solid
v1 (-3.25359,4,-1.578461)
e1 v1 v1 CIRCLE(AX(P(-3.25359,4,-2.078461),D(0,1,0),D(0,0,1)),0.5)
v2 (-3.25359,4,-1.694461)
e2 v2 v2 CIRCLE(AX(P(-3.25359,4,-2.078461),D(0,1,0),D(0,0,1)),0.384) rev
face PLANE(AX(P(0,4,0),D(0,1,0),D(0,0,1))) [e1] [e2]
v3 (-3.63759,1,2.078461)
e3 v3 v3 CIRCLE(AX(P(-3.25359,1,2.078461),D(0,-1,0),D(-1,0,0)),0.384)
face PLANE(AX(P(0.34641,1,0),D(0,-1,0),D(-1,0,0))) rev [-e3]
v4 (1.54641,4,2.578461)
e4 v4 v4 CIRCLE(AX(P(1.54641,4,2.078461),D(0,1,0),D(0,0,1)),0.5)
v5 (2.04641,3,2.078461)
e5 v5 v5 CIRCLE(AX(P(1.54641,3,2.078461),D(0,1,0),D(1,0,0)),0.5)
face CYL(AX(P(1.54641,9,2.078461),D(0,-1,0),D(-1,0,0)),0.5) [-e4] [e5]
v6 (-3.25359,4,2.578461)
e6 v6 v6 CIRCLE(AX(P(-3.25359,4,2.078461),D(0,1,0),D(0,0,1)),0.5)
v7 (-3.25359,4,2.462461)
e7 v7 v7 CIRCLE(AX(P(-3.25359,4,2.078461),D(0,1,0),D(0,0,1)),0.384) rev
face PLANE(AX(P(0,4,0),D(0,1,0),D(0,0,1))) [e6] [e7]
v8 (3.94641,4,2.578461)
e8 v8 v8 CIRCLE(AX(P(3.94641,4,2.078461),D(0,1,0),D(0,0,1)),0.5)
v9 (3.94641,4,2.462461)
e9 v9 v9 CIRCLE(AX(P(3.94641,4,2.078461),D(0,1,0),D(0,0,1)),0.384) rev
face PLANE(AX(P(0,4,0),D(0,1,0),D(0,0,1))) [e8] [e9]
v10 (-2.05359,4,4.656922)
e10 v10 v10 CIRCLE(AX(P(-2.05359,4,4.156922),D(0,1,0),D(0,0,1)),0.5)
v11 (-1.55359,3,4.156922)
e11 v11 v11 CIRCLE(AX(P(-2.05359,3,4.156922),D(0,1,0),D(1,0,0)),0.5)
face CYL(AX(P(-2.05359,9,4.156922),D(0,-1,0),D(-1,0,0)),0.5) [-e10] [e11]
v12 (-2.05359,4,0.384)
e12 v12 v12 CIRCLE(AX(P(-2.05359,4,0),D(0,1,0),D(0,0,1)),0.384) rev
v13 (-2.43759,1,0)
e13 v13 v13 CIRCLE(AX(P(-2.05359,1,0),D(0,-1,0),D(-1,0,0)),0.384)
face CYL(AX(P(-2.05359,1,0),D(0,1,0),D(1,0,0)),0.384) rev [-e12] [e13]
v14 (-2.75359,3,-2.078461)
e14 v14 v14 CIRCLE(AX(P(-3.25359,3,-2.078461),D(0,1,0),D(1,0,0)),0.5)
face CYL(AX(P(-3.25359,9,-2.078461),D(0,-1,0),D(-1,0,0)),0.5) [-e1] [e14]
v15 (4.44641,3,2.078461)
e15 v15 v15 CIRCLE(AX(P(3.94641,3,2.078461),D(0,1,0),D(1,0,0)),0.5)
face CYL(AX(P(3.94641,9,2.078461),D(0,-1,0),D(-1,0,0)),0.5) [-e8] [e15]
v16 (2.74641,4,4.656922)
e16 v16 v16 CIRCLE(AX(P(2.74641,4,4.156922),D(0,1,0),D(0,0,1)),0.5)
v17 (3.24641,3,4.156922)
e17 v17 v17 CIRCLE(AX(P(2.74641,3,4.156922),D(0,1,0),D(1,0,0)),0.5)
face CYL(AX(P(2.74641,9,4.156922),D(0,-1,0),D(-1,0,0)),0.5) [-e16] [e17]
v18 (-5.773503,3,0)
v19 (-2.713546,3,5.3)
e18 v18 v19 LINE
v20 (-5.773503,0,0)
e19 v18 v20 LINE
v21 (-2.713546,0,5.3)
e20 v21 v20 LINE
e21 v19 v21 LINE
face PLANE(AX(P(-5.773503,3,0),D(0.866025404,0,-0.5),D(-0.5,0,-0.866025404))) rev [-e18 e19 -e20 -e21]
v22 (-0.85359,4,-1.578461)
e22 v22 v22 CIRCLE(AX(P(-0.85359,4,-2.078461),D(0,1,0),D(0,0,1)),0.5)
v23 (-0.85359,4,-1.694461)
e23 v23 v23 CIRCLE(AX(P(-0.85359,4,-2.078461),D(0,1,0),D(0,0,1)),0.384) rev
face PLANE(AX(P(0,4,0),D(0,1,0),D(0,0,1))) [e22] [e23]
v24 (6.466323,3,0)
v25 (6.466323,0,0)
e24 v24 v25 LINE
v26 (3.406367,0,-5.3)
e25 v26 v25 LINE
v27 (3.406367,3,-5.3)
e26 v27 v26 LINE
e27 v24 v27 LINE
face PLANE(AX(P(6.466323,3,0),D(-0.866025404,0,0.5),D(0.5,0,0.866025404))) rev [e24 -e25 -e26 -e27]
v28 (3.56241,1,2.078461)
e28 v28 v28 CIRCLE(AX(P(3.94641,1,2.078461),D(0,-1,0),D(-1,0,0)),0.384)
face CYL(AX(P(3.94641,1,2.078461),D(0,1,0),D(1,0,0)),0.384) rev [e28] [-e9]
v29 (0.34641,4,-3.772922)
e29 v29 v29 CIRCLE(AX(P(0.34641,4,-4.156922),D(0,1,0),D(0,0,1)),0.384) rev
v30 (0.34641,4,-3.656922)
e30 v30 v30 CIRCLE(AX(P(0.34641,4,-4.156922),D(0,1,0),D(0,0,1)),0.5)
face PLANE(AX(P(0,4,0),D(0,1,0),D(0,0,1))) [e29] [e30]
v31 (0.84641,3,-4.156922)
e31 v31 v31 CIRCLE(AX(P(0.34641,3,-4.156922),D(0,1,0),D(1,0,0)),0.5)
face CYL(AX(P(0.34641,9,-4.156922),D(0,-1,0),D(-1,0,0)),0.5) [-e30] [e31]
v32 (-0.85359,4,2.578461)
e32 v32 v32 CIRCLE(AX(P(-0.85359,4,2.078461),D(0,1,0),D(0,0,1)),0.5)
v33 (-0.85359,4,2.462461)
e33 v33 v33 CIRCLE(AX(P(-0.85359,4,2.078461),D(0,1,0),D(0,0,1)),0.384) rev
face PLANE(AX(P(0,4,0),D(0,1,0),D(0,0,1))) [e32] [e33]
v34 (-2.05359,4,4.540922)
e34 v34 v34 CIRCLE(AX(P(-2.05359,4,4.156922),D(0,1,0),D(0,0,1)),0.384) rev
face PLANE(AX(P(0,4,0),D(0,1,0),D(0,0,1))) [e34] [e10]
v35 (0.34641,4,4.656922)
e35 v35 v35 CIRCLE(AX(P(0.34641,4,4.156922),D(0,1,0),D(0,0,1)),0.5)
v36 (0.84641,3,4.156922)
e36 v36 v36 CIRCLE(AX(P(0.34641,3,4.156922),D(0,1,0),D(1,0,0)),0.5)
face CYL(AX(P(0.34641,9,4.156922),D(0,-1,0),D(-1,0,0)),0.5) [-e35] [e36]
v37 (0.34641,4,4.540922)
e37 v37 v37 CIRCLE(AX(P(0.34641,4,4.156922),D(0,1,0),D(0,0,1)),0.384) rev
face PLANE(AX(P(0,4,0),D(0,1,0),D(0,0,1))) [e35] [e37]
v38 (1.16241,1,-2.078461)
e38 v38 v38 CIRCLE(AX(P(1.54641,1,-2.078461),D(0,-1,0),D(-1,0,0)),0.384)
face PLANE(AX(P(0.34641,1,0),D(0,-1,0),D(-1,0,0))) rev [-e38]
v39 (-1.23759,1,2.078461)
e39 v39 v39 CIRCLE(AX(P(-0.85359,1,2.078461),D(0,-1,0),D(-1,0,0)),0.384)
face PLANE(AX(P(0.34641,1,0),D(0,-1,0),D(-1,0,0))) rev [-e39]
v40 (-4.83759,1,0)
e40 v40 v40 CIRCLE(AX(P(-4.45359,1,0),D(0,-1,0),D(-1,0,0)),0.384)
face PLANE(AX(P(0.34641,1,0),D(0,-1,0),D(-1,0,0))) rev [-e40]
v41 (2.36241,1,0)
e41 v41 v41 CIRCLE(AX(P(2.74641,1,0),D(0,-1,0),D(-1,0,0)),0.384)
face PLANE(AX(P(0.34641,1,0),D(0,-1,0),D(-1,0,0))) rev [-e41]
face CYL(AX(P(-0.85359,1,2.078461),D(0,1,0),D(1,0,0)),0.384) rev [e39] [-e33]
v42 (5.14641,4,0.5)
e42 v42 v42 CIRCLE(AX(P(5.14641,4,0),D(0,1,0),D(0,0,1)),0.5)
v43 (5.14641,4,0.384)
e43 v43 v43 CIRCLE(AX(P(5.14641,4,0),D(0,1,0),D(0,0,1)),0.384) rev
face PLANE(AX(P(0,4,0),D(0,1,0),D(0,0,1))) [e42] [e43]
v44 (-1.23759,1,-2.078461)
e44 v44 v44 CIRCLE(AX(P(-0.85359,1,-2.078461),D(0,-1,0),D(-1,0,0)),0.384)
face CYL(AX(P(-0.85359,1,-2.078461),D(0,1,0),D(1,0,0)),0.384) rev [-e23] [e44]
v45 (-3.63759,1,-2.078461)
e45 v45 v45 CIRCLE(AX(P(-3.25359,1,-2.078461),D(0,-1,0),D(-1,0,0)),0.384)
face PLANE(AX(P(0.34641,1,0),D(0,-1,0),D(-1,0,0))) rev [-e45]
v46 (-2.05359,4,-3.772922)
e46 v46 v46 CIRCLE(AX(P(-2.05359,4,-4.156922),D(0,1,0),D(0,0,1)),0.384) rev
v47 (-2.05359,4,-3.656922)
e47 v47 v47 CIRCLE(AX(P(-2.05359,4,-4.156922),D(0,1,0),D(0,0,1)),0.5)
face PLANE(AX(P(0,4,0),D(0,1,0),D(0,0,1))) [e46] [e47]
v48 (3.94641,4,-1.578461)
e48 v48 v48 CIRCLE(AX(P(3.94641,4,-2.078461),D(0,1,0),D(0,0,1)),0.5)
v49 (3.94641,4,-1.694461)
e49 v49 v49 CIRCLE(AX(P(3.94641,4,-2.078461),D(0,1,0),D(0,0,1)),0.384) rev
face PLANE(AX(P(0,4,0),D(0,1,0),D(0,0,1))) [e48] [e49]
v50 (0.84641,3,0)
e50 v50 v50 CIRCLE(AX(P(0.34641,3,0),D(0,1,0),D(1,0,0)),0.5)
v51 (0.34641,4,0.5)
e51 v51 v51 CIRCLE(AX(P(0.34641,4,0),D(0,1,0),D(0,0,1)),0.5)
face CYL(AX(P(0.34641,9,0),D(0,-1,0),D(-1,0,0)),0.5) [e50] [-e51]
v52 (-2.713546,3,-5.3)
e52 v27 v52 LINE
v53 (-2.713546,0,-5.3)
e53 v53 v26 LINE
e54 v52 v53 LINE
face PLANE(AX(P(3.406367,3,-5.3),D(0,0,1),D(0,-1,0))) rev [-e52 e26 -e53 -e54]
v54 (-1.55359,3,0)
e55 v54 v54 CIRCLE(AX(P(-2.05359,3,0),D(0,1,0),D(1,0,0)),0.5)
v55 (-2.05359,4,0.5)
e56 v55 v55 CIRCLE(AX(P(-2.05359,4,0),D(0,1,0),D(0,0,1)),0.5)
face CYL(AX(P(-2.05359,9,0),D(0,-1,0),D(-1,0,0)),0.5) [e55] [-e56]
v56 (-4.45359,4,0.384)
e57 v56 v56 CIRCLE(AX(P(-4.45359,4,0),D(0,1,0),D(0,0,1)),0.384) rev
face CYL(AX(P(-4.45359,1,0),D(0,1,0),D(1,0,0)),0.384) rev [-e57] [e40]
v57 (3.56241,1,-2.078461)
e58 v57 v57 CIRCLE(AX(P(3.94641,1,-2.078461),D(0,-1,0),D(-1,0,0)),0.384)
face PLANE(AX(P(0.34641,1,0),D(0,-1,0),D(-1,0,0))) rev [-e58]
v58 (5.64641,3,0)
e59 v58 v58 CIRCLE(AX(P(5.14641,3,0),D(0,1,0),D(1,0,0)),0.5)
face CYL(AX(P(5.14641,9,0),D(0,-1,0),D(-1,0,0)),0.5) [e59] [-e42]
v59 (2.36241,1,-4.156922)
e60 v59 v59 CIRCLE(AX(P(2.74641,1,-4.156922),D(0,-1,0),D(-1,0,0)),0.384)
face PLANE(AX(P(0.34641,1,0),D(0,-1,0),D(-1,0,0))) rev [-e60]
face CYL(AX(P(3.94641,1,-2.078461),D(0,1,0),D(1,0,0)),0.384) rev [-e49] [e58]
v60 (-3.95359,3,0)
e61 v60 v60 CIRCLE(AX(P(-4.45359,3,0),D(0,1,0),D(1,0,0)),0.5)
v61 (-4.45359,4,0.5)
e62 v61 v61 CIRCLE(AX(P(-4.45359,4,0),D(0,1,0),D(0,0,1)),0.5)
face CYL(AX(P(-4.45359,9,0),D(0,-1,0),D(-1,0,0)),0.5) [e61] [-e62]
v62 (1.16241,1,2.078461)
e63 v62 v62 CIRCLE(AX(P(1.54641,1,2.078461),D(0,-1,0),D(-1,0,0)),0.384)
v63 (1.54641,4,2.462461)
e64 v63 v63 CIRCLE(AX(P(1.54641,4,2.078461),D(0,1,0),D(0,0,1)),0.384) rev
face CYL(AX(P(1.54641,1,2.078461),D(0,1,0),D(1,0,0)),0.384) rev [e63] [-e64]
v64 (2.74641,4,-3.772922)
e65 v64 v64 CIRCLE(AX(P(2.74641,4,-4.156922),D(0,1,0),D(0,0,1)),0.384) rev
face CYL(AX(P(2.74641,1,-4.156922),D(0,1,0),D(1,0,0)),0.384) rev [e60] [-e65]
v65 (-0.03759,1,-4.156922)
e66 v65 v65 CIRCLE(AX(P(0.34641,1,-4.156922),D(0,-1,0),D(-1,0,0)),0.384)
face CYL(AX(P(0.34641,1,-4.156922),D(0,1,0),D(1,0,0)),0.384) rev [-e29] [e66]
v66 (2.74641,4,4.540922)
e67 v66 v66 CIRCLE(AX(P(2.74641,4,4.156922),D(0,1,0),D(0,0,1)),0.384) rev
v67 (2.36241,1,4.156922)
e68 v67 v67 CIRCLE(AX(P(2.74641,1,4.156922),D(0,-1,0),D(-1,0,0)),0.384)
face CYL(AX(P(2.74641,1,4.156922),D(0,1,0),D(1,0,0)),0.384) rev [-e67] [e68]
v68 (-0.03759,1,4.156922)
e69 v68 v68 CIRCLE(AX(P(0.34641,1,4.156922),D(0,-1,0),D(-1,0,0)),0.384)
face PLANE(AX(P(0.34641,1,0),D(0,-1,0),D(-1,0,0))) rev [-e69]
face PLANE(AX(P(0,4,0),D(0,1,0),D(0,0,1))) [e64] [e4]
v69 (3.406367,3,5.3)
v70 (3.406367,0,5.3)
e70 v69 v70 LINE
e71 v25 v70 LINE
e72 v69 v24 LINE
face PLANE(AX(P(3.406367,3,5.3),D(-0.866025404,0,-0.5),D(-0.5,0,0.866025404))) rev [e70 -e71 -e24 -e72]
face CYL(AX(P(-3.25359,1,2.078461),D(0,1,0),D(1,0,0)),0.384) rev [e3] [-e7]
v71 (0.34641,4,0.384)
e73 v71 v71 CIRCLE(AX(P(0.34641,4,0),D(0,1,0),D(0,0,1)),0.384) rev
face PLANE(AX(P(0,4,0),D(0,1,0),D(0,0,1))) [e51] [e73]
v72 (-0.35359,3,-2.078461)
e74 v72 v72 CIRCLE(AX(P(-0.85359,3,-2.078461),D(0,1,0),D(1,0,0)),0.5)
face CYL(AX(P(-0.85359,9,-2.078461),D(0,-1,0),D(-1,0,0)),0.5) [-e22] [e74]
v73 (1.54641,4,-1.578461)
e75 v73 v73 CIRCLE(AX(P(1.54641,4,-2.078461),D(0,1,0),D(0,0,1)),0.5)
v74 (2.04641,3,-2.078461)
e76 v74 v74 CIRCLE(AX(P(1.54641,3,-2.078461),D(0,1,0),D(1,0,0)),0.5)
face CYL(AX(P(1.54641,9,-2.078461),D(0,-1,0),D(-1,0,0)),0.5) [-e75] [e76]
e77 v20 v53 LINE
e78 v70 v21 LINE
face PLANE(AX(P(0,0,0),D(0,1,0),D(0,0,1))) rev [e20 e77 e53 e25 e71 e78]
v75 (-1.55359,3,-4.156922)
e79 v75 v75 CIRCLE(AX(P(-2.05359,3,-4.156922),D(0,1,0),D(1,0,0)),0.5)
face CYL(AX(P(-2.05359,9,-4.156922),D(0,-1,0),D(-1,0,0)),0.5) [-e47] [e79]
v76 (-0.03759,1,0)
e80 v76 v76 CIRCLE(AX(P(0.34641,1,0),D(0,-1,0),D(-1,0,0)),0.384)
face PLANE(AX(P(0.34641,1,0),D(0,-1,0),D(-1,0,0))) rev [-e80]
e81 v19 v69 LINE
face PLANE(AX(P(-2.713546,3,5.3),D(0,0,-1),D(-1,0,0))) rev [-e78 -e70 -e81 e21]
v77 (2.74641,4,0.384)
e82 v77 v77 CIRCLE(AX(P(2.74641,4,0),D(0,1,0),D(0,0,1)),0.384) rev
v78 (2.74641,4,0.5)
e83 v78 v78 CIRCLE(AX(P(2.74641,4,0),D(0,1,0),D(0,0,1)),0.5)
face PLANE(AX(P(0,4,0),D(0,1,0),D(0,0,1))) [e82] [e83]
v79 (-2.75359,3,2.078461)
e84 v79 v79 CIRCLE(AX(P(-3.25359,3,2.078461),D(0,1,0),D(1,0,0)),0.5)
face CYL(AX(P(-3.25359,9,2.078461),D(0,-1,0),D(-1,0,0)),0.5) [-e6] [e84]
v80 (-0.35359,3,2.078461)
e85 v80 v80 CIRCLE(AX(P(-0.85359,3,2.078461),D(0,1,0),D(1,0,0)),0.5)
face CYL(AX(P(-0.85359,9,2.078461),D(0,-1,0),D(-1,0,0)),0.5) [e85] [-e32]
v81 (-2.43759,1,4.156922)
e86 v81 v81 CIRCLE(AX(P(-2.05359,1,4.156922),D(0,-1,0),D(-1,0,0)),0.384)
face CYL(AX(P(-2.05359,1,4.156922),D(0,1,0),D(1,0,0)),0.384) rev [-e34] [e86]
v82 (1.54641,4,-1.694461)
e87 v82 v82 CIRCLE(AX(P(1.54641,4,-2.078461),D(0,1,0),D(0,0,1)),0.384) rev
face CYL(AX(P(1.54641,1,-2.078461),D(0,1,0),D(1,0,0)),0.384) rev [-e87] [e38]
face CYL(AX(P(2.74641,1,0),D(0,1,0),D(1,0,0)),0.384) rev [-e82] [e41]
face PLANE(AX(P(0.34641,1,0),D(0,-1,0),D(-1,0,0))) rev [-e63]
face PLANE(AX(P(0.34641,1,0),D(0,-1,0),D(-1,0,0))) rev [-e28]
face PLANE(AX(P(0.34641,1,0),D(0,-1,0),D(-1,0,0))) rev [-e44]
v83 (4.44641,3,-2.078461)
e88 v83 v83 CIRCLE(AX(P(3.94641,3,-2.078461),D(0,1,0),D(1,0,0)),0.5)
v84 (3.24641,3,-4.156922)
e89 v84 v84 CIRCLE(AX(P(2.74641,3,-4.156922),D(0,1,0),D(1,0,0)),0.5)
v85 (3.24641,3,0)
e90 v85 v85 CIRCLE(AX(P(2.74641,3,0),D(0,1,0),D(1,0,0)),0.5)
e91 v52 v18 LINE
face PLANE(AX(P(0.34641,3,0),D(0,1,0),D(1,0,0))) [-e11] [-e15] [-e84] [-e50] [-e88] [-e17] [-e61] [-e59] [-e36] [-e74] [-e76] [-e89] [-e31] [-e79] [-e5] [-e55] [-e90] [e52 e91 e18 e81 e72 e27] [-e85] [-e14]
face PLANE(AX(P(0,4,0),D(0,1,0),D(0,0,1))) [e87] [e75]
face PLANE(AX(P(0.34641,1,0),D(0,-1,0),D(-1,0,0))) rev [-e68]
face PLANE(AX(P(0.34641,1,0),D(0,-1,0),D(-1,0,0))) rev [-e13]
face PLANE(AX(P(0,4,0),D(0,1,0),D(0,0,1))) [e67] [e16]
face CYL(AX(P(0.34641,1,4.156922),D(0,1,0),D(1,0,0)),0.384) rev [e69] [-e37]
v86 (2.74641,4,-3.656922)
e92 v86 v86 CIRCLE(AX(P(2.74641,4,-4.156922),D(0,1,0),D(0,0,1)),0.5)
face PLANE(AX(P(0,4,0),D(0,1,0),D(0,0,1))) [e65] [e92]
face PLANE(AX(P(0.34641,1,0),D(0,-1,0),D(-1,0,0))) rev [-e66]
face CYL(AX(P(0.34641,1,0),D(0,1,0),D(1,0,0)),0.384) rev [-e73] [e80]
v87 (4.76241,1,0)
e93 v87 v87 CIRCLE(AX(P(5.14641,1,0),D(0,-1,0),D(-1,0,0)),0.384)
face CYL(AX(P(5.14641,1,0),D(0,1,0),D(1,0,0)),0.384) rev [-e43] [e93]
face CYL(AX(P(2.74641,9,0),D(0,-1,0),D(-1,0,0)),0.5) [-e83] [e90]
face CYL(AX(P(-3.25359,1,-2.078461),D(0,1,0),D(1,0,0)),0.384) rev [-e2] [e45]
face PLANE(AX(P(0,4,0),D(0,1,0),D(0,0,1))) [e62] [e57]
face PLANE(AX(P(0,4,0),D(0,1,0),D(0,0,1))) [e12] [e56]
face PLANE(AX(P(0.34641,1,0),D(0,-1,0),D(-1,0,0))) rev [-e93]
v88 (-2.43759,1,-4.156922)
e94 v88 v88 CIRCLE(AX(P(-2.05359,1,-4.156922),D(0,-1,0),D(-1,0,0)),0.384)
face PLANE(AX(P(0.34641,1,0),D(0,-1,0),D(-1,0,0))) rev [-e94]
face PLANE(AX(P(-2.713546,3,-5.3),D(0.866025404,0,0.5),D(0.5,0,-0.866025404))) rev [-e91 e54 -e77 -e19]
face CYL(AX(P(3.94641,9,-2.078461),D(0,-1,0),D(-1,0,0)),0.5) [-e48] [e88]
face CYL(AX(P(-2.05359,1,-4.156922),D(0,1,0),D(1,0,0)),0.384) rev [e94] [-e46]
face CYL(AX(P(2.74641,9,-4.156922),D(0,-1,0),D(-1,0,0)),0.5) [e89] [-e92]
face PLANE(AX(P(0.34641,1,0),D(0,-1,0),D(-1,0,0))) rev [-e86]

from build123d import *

# Parameters (mm, degrees)
BOSS_EXTRUDE1_DEPTH = 4
CAVITY1_START       = 3
CAVITY1_OUTLINE_R   = 0.5
CAVITY1_OUTLINE_R_2 = 0.384
CAVITY1_DEPTH       = 1
CAVITY1_2_DEPTH     = 3
CAVITY1_START_2     = 1
CAVITY1_3_OUTLINE_R = 0.384
CAVITY1_3_DEPTH     = 2


# Read off the part's stored shape, not the designer's step: Cavity1
with BuildPart() as part:
    # Sketch1 → Boss-Extrude1 (new body)
    with BuildSketch(Plane(origin=(0, 0, 0), x_dir=(1, 0, 0), z_dir=(0, 1, 0))):
        Polygon((6.92820323, 0), (3.464101615, 6), (-3.464101615, 6), (-6.92820323, 0), (-3.464101615, -6), (3.464101615, -6), align=None)
    extrude(amount=BOSS_EXTRUDE1_DEPTH)

    # Cavity1 outline → Cavity1 (cut)
    # profile 1 of 20: a face of its own
    with BuildSketch(Plane(origin=(0, 0, 0), x_dir=(1, 0, 0), z_dir=(0, 1, 0)).offset(CAVITY1_START)):
        Polygon((3.464101615, -6), (6.92820323, 0), (3.464101615, 6), (-3.464101615, 6), (-6.92820323, 0), (-3.464101615, -6), align=None)
        with Locations((-2.053589838, -4.156921938)):
            Circle(CAVITY1_OUTLINE_R, mode=Mode.SUBTRACT)
        with Locations((-4.453589838, 0)):
            Circle(CAVITY1_OUTLINE_R, mode=Mode.SUBTRACT)
        with Locations((-3.253589838, -2.078460969)):
            Circle(CAVITY1_OUTLINE_R, mode=Mode.SUBTRACT)
        with Locations((-0.853589838, -2.078460969)):
            Circle(CAVITY1_OUTLINE_R, mode=Mode.SUBTRACT)
        with Locations((-2.053589838, 0)):
            Circle(CAVITY1_OUTLINE_R, mode=Mode.SUBTRACT)
        with Locations((0.346410162, -4.156921938)):
            Circle(CAVITY1_OUTLINE_R, mode=Mode.SUBTRACT)
        with Locations((2.746410162, -4.156921938)):
            Circle(CAVITY1_OUTLINE_R, mode=Mode.SUBTRACT)
        with Locations((1.546410162, -2.078460969)):
            Circle(CAVITY1_OUTLINE_R, mode=Mode.SUBTRACT)
        with Locations((0.346410162, 0)):
            Circle(CAVITY1_OUTLINE_R, mode=Mode.SUBTRACT)
        with Locations((2.746410162, 0)):
            Circle(CAVITY1_OUTLINE_R, mode=Mode.SUBTRACT)
        with Locations((3.946410162, -2.078460969)):
            Circle(CAVITY1_OUTLINE_R, mode=Mode.SUBTRACT)
        with Locations((5.146410162, 0)):
            Circle(CAVITY1_OUTLINE_R, mode=Mode.SUBTRACT)
        with Locations((-3.253589838, 2.078460969)):
            Circle(CAVITY1_OUTLINE_R, mode=Mode.SUBTRACT)
        with Locations((-0.853589838, 2.078460969)):
            Circle(CAVITY1_OUTLINE_R, mode=Mode.SUBTRACT)
        with Locations((-2.053589838, 4.156921938)):
            Circle(CAVITY1_OUTLINE_R, mode=Mode.SUBTRACT)
        with Locations((1.546410162, 2.078460969)):
            Circle(CAVITY1_OUTLINE_R, mode=Mode.SUBTRACT)
        with Locations((3.946410162, 2.078460969)):
            Circle(CAVITY1_OUTLINE_R, mode=Mode.SUBTRACT)
        with Locations((0.346410162, 4.156921938)):
            Circle(CAVITY1_OUTLINE_R, mode=Mode.SUBTRACT)
        with Locations((2.746410162, 4.156921938)):
            Circle(CAVITY1_OUTLINE_R, mode=Mode.SUBTRACT)
    # profile 2 of 20: a face of its own
    with BuildSketch(Plane(origin=(0, 0, 0), x_dir=(1, 0, 0), z_dir=(0, 1, 0)).offset(CAVITY1_START)):
        with Locations((0.346410162, 0)):
            Circle(CAVITY1_OUTLINE_R_2)
    # profile 3 of 20: a face of its own
    with BuildSketch(Plane(origin=(0, 0, 0), x_dir=(1, 0, 0), z_dir=(0, 1, 0)).offset(CAVITY1_START)):
        with Locations((3.946410162, 2.078460969)):
            Circle(CAVITY1_OUTLINE_R_2)
    # profile 4 of 20: a face of its own
    with BuildSketch(Plane(origin=(0, 0, 0), x_dir=(1, 0, 0), z_dir=(0, 1, 0)).offset(CAVITY1_START)):
        with Locations((5.146410162, 0)):
            Circle(CAVITY1_OUTLINE_R_2)
    # profile 5 of 20: a face of its own
    with BuildSketch(Plane(origin=(0, 0, 0), x_dir=(1, 0, 0), z_dir=(0, 1, 0)).offset(CAVITY1_START)):
        with Locations((2.746410162, 0)):
            Circle(CAVITY1_OUTLINE_R_2)
    # profile 6 of 20: a face of its own
    with BuildSketch(Plane(origin=(0, 0, 0), x_dir=(1, 0, 0), z_dir=(0, 1, 0)).offset(CAVITY1_START)):
        with Locations((0.346410162, 4.156921938)):
            Circle(CAVITY1_OUTLINE_R_2)
    # profile 7 of 20: a face of its own
    with BuildSketch(Plane(origin=(0, 0, 0), x_dir=(1, 0, 0), z_dir=(0, 1, 0)).offset(CAVITY1_START)):
        with Locations((2.746410162, 4.156921938)):
            Circle(CAVITY1_OUTLINE_R_2)
    # profile 8 of 20: a face of its own
    with BuildSketch(Plane(origin=(0, 0, 0), x_dir=(1, 0, 0), z_dir=(0, 1, 0)).offset(CAVITY1_START)):
        with Locations((1.546410162, 2.078460969)):
            Circle(CAVITY1_OUTLINE_R_2)
    # profile 9 of 20: a face of its own
    with BuildSketch(Plane(origin=(0, 0, 0), x_dir=(1, 0, 0), z_dir=(0, 1, 0)).offset(CAVITY1_START)):
        with Locations((-3.253589838, 2.078460969)):
            Circle(CAVITY1_OUTLINE_R_2)
    # profile 10 of 20: a face of its own
    with BuildSketch(Plane(origin=(0, 0, 0), x_dir=(1, 0, 0), z_dir=(0, 1, 0)).offset(CAVITY1_START)):
        with Locations((-2.053589838, 4.156921938)):
            Circle(CAVITY1_OUTLINE_R_2)
    # profile 11 of 20: a face of its own
    with BuildSketch(Plane(origin=(0, 0, 0), x_dir=(1, 0, 0), z_dir=(0, 1, 0)).offset(CAVITY1_START)):
        with Locations((-0.853589838, 2.078460969)):
            Circle(CAVITY1_OUTLINE_R_2)
    # profile 12 of 20: a face of its own
    with BuildSketch(Plane(origin=(0, 0, 0), x_dir=(1, 0, 0), z_dir=(0, 1, 0)).offset(CAVITY1_START)):
        with Locations((-3.253589838, -2.078460969)):
            Circle(CAVITY1_OUTLINE_R_2)
    # profile 13 of 20: a face of its own
    with BuildSketch(Plane(origin=(0, 0, 0), x_dir=(1, 0, 0), z_dir=(0, 1, 0)).offset(CAVITY1_START)):
        with Locations((-4.453589838, 0)):
            Circle(CAVITY1_OUTLINE_R_2)
    # profile 14 of 20: a face of its own
    with BuildSketch(Plane(origin=(0, 0, 0), x_dir=(1, 0, 0), z_dir=(0, 1, 0)).offset(CAVITY1_START)):
        with Locations((-2.053589838, 0)):
            Circle(CAVITY1_OUTLINE_R_2)
    # profile 15 of 20: a face of its own
    with BuildSketch(Plane(origin=(0, 0, 0), x_dir=(1, 0, 0), z_dir=(0, 1, 0)).offset(CAVITY1_START)):
        with Locations((0.346410162, -4.156921938)):
            Circle(CAVITY1_OUTLINE_R_2)
    # profile 16 of 20: a face of its own
    with BuildSketch(Plane(origin=(0, 0, 0), x_dir=(1, 0, 0), z_dir=(0, 1, 0)).offset(CAVITY1_START)):
        with Locations((-2.053589838, -4.156921938)):
            Circle(CAVITY1_OUTLINE_R_2)
    # profile 17 of 20: a face of its own
    with BuildSketch(Plane(origin=(0, 0, 0), x_dir=(1, 0, 0), z_dir=(0, 1, 0)).offset(CAVITY1_START)):
        with Locations((-0.853589838, -2.078460969)):
            Circle(CAVITY1_OUTLINE_R_2)
    # profile 18 of 20: a face of its own
    with BuildSketch(Plane(origin=(0, 0, 0), x_dir=(1, 0, 0), z_dir=(0, 1, 0)).offset(CAVITY1_START)):
        with Locations((3.946410162, -2.078460969)):
            Circle(CAVITY1_OUTLINE_R_2)
    # profile 19 of 20: a face of its own
    with BuildSketch(Plane(origin=(0, 0, 0), x_dir=(1, 0, 0), z_dir=(0, 1, 0)).offset(CAVITY1_START)):
        with Locations((2.746410162, -4.156921938)):
            Circle(CAVITY1_OUTLINE_R_2)
    # profile 20 of 20: a face of its own
    with BuildSketch(Plane(origin=(0, 0, 0), x_dir=(1, 0, 0), z_dir=(0, 1, 0)).offset(CAVITY1_START)):
        with Locations((1.546410162, -2.078460969)):
            Circle(CAVITY1_OUTLINE_R_2)
    extrude(amount=CAVITY1_DEPTH, mode=Mode.SUBTRACT)

    # Cavity1 2 outline → Cavity1 2 (cut)
    with BuildSketch(Plane(origin=(0, 0, 0), x_dir=(1, 0, 0), z_dir=(0, 1, 0))):
        Polygon((3.464101615, -6), (6.92820323, 0), (3.464101615, 6), (-3.464101615, 6), (-6.92820323, 0), (-3.464101615, -6), align=None)
        Polygon((6.466323015, 0), (3.406366588, -5.3), (-2.713546265, -5.3), (-5.773502692, 0), (-2.713546265, 5.3), (3.406366588, 5.3), align=None, mode=Mode.SUBTRACT)
    extrude(amount=CAVITY1_2_DEPTH, mode=Mode.SUBTRACT)

    # Cavity1 3 outline → Cavity1 3 (cut)
    with BuildSketch(Plane(origin=(0, 0, 0), x_dir=(1, 0, 0), z_dir=(0, 1, 0)).offset(CAVITY1_START_2)):
        with Locations((0.346410162, 0)):
            Circle(CAVITY1_3_OUTLINE_R)
        with Locations((3.946410162, 2.078460969)):
            Circle(CAVITY1_3_OUTLINE_R)
        with Locations((5.146410162, 0)):
            Circle(CAVITY1_3_OUTLINE_R)
        with Locations((2.746410162, 0)):
            Circle(CAVITY1_3_OUTLINE_R)
        with Locations((0.346410162, 4.156921938)):
            Circle(CAVITY1_3_OUTLINE_R)
        with Locations((2.746410162, 4.156921938)):
            Circle(CAVITY1_3_OUTLINE_R)
        with Locations((1.546410162, 2.078460969)):
            Circle(CAVITY1_3_OUTLINE_R)
        with Locations((-3.253589838, 2.078460969)):
            Circle(CAVITY1_3_OUTLINE_R)
        with Locations((-2.053589838, 4.156921938)):
            Circle(CAVITY1_3_OUTLINE_R)
        with Locations((-0.853589838, 2.078460969)):
            Circle(CAVITY1_3_OUTLINE_R)
        with Locations((-3.253589838, -2.078460969)):
            Circle(CAVITY1_3_OUTLINE_R)
        with Locations((-4.453589838, 0)):
            Circle(CAVITY1_3_OUTLINE_R)
        with Locations((-2.053589838, 0)):
            Circle(CAVITY1_3_OUTLINE_R)
        with Locations((0.346410162, -4.156921938)):
            Circle(CAVITY1_3_OUTLINE_R)
        with Locations((-2.053589838, -4.156921938)):
            Circle(CAVITY1_3_OUTLINE_R)
        with Locations((-0.853589838, -2.078460969)):
            Circle(CAVITY1_3_OUTLINE_R)
        with Locations((3.946410162, -2.078460969)):
            Circle(CAVITY1_3_OUTLINE_R)
        with Locations((2.746410162, -4.156921938)):
            Circle(CAVITY1_3_OUTLINE_R)
        with Locations((1.546410162, -2.078460969)):
            Circle(CAVITY1_3_OUTLINE_R)
    extrude(amount=CAVITY1_3_DEPTH, mode=Mode.SUBTRACT)


solid = part.part
